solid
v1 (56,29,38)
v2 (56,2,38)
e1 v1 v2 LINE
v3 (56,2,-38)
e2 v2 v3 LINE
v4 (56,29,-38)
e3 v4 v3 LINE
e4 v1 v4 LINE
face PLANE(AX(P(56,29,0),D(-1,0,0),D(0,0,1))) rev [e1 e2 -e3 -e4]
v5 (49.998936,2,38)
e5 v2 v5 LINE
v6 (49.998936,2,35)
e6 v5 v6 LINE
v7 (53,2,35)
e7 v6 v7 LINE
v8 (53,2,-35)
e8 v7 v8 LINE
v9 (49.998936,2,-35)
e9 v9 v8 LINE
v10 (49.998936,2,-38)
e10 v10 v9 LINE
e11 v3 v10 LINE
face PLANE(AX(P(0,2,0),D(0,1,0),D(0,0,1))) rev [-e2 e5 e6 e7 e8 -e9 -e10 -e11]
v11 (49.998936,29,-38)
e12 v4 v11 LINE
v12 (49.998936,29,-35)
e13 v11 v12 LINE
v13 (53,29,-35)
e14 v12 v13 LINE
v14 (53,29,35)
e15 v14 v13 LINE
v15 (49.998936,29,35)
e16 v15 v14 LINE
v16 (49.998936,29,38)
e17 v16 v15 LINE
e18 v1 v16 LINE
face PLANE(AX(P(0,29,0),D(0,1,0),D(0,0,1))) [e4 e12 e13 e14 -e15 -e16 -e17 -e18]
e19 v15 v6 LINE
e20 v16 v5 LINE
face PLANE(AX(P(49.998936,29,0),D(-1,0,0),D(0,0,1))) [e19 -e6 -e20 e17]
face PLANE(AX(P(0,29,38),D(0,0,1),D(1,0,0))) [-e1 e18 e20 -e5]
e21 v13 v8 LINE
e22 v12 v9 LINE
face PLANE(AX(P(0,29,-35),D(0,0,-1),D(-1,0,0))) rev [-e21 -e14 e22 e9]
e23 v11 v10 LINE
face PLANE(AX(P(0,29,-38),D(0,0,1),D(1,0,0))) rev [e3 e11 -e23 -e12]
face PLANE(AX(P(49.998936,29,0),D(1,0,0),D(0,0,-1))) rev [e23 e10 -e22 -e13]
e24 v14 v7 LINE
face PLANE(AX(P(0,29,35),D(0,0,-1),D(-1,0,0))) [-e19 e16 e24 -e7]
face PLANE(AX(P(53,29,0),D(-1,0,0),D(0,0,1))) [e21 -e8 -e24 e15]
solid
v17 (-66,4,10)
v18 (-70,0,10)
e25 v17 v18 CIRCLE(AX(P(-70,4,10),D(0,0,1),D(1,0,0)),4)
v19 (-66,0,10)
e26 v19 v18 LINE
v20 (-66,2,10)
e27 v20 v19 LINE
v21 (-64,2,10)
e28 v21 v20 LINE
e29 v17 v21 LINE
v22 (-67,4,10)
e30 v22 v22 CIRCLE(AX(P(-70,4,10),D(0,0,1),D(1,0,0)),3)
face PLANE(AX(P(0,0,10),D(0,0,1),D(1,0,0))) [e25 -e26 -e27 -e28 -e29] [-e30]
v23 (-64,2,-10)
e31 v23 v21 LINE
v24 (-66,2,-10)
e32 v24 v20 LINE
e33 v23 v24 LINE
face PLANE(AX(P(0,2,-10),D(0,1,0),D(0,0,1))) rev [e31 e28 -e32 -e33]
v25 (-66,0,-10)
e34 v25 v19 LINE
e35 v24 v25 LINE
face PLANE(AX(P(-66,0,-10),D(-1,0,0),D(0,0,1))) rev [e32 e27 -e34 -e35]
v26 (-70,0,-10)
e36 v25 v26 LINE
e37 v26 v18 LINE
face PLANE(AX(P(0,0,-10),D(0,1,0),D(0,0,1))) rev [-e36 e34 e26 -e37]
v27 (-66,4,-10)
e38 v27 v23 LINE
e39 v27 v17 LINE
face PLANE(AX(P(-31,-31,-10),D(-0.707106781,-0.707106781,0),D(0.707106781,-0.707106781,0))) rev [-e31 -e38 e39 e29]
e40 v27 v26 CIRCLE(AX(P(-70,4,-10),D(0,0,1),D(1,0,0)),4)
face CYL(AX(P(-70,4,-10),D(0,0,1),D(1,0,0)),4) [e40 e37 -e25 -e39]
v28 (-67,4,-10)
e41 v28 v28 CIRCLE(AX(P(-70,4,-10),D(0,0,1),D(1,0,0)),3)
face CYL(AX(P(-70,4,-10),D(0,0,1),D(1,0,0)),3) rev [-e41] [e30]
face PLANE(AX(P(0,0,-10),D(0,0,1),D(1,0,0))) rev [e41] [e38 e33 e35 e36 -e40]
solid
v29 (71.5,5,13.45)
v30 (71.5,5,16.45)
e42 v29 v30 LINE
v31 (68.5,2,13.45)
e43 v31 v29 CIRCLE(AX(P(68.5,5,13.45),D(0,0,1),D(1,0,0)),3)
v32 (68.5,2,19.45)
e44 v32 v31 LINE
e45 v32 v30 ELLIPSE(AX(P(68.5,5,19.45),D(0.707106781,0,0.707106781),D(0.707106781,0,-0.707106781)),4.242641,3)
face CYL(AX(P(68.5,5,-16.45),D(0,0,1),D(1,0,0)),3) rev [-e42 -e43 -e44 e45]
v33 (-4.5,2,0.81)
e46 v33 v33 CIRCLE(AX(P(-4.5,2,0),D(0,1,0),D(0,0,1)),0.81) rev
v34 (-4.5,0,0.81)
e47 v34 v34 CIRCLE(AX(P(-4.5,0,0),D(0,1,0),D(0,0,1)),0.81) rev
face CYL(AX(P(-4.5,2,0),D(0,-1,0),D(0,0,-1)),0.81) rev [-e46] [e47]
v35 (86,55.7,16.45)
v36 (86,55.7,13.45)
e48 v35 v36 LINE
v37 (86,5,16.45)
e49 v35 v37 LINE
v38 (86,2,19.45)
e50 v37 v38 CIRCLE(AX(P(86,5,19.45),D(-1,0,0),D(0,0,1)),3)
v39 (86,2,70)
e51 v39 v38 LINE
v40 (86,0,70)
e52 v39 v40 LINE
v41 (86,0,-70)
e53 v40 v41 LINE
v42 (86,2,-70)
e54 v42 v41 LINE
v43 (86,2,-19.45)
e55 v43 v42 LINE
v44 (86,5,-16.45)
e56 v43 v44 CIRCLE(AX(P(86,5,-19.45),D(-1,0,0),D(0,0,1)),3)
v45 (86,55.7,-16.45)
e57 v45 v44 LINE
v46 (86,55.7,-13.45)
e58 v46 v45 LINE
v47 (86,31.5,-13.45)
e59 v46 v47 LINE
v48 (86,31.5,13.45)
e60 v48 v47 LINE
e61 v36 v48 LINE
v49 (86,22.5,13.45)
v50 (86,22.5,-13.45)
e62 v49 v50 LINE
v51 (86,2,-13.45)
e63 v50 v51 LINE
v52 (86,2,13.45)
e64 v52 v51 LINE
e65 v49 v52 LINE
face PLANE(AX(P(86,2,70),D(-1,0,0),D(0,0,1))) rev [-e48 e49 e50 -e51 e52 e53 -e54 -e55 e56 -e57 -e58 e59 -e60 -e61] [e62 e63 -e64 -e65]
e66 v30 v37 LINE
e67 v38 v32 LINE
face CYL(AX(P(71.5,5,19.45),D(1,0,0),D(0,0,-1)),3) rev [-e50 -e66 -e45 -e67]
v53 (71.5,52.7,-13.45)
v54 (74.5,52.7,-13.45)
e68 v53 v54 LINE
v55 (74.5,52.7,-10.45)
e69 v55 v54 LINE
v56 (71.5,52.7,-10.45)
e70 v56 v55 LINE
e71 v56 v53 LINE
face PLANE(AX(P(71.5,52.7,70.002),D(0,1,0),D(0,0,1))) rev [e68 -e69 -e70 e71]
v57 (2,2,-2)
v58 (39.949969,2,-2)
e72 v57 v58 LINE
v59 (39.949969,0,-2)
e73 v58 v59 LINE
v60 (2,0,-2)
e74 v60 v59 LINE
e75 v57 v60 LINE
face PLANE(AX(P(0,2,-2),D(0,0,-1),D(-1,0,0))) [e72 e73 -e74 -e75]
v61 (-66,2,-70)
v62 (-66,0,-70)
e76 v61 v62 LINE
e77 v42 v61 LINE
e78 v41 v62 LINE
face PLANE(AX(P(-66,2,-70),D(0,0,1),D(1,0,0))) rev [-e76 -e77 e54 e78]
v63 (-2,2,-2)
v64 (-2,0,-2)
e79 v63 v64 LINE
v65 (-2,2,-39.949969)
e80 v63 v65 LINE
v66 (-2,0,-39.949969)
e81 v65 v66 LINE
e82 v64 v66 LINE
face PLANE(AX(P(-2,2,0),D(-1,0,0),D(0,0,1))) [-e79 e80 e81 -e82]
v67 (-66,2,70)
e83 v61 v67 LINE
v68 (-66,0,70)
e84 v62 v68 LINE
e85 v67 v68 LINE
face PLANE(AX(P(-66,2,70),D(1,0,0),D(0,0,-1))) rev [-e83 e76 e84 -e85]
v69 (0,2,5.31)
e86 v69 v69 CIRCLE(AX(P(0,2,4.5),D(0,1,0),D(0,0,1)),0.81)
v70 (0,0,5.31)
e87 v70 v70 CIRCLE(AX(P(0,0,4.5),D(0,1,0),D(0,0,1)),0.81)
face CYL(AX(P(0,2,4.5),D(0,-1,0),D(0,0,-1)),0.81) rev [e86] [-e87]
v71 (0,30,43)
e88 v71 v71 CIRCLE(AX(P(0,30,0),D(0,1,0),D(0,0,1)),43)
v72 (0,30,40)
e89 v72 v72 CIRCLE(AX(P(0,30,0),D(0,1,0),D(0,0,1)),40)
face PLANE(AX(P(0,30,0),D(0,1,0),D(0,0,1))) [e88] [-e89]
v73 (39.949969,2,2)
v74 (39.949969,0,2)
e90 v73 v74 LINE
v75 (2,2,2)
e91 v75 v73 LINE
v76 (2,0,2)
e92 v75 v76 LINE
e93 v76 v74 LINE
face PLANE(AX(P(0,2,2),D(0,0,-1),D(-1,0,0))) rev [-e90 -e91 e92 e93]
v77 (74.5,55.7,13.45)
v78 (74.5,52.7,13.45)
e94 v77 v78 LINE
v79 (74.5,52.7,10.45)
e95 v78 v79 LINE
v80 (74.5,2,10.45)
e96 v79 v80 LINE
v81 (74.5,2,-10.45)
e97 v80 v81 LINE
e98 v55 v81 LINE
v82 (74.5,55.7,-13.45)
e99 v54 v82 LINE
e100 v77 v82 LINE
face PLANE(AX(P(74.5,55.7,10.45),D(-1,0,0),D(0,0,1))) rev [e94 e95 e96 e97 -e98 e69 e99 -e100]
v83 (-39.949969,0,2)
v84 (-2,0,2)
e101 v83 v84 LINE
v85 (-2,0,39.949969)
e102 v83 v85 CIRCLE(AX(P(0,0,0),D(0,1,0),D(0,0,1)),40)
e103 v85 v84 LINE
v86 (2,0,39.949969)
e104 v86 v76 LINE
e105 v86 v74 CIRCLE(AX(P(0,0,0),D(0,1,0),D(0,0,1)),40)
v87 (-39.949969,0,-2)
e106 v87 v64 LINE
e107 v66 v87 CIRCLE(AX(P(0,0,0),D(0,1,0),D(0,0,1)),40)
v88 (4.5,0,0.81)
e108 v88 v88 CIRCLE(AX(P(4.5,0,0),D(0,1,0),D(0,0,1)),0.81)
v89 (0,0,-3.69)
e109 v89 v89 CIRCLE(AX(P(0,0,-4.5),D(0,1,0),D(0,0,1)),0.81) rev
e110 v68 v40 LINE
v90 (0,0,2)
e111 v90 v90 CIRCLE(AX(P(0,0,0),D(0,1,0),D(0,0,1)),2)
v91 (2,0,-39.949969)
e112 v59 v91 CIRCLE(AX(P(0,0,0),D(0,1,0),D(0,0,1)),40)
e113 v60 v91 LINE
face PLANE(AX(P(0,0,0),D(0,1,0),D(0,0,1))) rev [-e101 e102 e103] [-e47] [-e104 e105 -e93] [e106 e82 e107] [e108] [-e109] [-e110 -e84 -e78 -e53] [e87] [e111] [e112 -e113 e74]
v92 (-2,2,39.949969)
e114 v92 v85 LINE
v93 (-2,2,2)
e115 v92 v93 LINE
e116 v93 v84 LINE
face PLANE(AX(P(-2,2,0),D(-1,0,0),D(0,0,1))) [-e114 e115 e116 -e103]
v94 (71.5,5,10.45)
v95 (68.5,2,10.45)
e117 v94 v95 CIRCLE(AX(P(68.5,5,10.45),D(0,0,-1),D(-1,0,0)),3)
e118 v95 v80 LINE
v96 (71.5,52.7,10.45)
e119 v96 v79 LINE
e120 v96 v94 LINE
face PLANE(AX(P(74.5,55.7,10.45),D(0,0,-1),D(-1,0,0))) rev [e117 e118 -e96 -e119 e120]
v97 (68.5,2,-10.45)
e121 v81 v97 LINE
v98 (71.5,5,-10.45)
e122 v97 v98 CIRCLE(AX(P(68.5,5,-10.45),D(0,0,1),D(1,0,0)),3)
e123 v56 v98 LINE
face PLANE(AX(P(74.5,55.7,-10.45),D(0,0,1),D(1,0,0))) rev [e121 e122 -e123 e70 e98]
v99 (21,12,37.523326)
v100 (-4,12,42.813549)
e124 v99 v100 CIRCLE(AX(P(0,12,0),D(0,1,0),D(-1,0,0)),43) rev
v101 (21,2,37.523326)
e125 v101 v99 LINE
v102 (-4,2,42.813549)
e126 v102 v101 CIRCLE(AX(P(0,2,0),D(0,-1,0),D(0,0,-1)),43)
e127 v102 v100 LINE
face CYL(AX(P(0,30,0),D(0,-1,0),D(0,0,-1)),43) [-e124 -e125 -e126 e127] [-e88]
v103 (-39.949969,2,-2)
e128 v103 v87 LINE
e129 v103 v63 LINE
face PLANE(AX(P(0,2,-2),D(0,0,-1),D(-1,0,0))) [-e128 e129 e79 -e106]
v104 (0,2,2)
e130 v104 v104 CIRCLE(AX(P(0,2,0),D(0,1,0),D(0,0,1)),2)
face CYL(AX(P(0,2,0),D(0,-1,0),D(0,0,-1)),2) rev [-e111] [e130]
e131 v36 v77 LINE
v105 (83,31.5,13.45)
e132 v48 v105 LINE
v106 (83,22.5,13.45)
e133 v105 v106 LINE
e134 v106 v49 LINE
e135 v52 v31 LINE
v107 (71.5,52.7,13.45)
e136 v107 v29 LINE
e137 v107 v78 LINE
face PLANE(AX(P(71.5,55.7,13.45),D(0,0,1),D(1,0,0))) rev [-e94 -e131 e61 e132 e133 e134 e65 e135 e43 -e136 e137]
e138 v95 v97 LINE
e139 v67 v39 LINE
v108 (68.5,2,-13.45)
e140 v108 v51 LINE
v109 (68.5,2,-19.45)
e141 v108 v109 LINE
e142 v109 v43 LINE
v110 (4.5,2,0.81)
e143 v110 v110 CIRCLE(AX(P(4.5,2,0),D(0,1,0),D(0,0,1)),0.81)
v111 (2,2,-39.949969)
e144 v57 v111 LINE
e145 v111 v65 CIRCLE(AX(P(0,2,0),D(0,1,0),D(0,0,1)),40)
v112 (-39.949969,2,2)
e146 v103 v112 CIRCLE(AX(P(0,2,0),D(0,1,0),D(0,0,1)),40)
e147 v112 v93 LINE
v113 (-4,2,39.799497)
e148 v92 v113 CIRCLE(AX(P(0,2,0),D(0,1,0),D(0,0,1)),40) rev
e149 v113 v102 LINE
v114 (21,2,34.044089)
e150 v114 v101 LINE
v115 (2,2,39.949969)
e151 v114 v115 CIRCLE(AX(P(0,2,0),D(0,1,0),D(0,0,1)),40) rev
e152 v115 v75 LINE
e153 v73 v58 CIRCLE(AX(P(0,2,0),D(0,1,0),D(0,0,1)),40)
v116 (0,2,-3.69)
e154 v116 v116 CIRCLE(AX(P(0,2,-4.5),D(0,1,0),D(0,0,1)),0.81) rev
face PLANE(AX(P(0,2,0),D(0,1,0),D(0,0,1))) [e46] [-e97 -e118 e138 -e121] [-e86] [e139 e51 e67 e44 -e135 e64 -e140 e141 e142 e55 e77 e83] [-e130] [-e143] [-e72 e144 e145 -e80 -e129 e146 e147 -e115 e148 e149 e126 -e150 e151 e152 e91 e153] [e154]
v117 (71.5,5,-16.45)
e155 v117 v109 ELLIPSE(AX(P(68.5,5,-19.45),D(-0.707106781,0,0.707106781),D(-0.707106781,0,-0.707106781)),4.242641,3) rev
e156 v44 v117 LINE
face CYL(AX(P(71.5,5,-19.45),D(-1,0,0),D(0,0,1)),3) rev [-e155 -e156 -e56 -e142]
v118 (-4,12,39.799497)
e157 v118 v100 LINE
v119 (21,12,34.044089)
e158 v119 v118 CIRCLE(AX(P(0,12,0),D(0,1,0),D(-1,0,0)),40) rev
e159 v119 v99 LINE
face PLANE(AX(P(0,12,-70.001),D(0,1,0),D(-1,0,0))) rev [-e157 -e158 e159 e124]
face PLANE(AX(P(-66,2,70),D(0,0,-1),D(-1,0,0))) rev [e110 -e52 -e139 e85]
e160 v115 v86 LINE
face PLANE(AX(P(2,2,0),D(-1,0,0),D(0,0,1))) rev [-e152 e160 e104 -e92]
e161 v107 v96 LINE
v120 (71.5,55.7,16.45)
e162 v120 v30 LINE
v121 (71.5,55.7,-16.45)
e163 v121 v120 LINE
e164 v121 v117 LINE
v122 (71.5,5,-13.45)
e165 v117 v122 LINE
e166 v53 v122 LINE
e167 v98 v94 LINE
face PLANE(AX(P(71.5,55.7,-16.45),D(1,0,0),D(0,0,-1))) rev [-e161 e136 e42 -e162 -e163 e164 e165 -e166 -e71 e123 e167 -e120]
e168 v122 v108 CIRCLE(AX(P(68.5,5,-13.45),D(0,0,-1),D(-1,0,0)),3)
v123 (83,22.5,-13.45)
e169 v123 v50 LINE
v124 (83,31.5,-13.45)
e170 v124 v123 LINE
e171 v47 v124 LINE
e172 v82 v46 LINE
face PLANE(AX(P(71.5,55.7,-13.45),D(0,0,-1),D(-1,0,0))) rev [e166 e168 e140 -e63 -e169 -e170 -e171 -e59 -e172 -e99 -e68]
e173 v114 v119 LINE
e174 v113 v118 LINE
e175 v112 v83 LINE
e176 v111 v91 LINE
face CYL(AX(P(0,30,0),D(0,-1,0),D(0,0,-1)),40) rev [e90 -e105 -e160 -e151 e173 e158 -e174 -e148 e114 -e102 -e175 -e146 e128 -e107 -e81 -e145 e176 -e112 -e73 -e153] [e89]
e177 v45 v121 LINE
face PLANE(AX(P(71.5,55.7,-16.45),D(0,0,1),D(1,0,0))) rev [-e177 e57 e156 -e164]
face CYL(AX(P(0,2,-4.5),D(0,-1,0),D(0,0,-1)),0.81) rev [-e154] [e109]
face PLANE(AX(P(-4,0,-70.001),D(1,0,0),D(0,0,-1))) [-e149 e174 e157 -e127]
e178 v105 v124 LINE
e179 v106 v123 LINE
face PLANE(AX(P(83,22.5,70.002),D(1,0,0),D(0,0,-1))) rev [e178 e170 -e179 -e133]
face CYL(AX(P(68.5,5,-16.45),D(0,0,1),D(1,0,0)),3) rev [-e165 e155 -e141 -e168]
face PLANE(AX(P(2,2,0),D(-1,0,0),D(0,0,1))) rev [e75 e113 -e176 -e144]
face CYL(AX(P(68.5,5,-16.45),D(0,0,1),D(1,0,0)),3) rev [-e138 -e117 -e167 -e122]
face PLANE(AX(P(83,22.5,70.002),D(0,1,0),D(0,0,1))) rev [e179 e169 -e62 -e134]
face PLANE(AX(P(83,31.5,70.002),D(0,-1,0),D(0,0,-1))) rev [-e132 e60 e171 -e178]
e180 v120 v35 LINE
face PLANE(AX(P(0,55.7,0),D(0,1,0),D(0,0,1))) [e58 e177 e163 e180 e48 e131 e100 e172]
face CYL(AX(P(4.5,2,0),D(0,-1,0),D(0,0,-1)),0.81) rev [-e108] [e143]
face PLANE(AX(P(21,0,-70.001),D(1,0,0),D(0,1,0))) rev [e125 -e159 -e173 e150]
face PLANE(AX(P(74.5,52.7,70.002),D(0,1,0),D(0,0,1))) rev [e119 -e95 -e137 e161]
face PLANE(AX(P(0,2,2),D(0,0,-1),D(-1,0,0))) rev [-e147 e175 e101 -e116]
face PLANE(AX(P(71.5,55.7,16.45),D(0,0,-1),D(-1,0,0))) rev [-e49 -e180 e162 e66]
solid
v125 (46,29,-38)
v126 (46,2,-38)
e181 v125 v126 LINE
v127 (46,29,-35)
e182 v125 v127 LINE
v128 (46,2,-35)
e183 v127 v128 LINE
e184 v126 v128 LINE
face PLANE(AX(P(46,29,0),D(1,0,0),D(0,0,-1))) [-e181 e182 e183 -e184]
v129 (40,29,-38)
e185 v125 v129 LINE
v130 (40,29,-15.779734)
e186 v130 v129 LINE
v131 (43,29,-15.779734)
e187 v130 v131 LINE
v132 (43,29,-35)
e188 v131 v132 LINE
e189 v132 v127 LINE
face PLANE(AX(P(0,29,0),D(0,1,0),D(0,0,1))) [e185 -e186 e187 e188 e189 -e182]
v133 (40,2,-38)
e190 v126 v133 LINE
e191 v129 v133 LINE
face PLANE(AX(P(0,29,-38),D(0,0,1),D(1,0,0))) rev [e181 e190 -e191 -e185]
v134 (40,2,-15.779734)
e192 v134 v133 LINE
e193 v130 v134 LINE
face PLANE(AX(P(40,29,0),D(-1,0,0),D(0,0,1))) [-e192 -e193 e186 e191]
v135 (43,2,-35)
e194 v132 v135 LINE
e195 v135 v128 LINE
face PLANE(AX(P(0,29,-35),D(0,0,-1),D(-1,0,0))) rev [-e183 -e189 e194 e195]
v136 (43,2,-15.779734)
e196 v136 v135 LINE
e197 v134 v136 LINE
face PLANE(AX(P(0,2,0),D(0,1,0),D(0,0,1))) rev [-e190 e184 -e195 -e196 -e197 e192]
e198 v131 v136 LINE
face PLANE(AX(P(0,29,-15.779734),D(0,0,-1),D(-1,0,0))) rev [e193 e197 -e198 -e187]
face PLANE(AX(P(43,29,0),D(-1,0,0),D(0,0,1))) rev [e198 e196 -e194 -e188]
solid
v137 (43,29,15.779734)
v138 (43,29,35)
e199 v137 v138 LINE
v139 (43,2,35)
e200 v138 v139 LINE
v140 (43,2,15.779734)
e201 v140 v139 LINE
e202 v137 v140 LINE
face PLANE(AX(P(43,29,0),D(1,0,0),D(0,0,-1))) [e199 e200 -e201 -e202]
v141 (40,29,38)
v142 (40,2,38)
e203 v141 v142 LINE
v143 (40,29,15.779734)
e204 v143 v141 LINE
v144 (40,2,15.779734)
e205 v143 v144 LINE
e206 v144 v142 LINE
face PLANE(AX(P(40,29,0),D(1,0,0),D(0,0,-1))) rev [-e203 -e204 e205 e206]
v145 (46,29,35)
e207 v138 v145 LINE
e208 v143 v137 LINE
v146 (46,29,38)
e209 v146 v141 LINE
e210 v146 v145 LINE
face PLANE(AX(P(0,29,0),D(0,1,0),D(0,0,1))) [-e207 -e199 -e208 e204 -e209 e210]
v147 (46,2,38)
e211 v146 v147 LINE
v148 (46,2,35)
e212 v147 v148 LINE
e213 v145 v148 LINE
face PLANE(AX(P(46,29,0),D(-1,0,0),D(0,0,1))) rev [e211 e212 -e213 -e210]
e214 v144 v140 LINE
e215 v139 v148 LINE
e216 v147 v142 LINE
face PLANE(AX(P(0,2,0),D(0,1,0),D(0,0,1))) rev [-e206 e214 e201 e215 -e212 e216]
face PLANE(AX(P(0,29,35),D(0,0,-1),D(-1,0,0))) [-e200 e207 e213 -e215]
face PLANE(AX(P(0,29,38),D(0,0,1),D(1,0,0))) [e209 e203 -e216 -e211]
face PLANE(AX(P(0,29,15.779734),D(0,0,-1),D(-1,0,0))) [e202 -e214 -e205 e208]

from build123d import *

# Parameters (mm, degrees)
CROQUIS1_R                 = 43
CROQUIS1_R_2               = 40
SALIENTE_EXTRUIR1_DEPTH    = 30
CROQUIS3_R                 = 0.81
CROQUIS3_R_2               = 2
SALIENTE_EXTRUIR2_DEPTH    = 2
CROQUIS4_W                 = 152
CROQUIS4_H                 = 140
CROQUIS4_R                 = 43
SALIENTE_EXTRUIR3_DEPTH    = 2
SALIENTE_EXTRUIR17_DEPTH   = 27
SALIENTE_EXTRUIR17_2_DEPTH = 27
SALIENTE_EXTRUIR17_3_DEPTH = 27
CORTAR_EXTRUIR1_REACH      = 169.021
CORTAR_EXTRUIR1_END_RADIUS = 40
CROQUIS15_W                = 25
CROQUIS15_H                = 10
SALIENTE_EXTRUIR19_START   = -60
CROQUIS18_R                = 4
CROQUIS18_R_2              = 3
SALIENTE_EXTRUIR19_DEPTH   = 20
CROQUIS19_W                = 14.5
CROQUIS19_H                = 3
CROQUIS19_W_2              = 3
CROQUIS19_H_2              = 20.9
SALIENTE_EXTRUIR20_DEPTH   = 53.7
SALIENTE_EXTRUIR21_REACH   = 134.145
CROQUIS20_W                = 3
CROQUIS20_H                = 3
CROQUIS20_H_2              = 9
SALIENTE_EXTRUIR22_START   = 23.9
CROQUIS20_2_W              = 3
CROQUIS20_2_H              = 3
SALIENTE_EXTRUIR22_DEPTH   = 3
REDONDEO1_R                = 3


with BuildPart() as part:
    # Croquis1 → Saliente-Extruir1 (new body)
    with BuildSketch(Plane(origin=(0, 0, 0), x_dir=(1, 0, 0), z_dir=(0, 1, 0))):
        with Locations(Location((0, 0, 0), (0, 0, 270))):
            Circle(CROQUIS1_R)
        with Locations(Location((0, 0, 0), (0, 0, 270))):
            Circle(CROQUIS1_R_2, mode=Mode.SUBTRACT)
    extrude(amount=SALIENTE_EXTRUIR1_DEPTH)

    # Croquis3 → Saliente-Extruir2 (add)
    with BuildSketch(Plane(origin=(0, 0, 0), x_dir=(1, 0, 0), z_dir=(0, 1, 0))):
        with BuildLine():
            Line((-2, 39.949968711), (-2, 2))
            Line((-2, 2), (-39.949968711, 2))
            ThreePointArc((-39.949968711, 2), (-40, 0), (-39.949968711, -2))
            Line((-39.949968711, -2), (-2, -2))
            Line((-2, -2), (-2, -39.949968711))
            ThreePointArc((-2, -39.949968711), (0, -40), (2, -39.949968711))
            Line((2, -39.949968711), (2, -2))
            Line((2, -2), (39.949968711, -2))
            ThreePointArc((39.949968711, -2), (39.987490222, -1.000312842), (40, 0))
            ThreePointArc((40, 0), (39.987490222, 1.000312842), (39.949968711, 2))
            Line((39.949968711, 2), (2, 2))
            Line((2, 2), (2, 39.949968711))
            ThreePointArc((2, 39.949968711), (0, 40), (-2, 39.949968711))
        make_face()
        with Locations(Location((0, -4.5, 0), (0, 0, 270))):
            Circle(CROQUIS3_R, mode=Mode.SUBTRACT)
        with Locations(Location((-4.5, 0, 0), (0, 0, 270))):
            Circle(CROQUIS3_R, mode=Mode.SUBTRACT)
        with Locations(Location((0, 0, 0), (0, 0, 270))):
            Circle(CROQUIS3_R_2, mode=Mode.SUBTRACT)
        with Locations(Location((4.5, 0, 0), (0, 0, 270))):
            Circle(CROQUIS3_R, mode=Mode.SUBTRACT)
        with Locations(Location((0, 4.5, 0), (0, 0, 270))):
            Circle(CROQUIS3_R, mode=Mode.SUBTRACT)
    extrude(amount=SALIENTE_EXTRUIR2_DEPTH)

    # Croquis4 → Saliente-Extruir3 (add)
    with BuildSketch(Plane(origin=(0, 0, 0), x_dir=(1, 0, 0), z_dir=(0, 1, 0))):
        with Locations((10, 0)):
            Rectangle(CROQUIS4_W, CROQUIS4_H)
        with Locations(Location((0, 0, 0), (0, 0, 90))):
            Circle(CROQUIS4_R, mode=Mode.SUBTRACT)
    extrude(amount=SALIENTE_EXTRUIR3_DEPTH)

    # Cortar-Extruir1: up to this cylinder (the profile starts outside it)
    cortar_extruir1_end = Plane(origin=(0, 7, 0), z_dir=(0, -1, 0)) * Cylinder(CORTAR_EXTRUIR1_END_RADIUS, 419.042, mode=Mode.PRIVATE)
    # Croquis15 → Cortar-Extruir1 (cut, up to the surface)
    with BuildSketch(Plane.XY.offset(70), mode=Mode.PRIVATE) as cortar_extruir1_sk1:
        with Locations((8.5, 7)):
            Rectangle(CROQUIS15_W, CROQUIS15_H)
    cortar_extruir1_tool1 = extrude(cortar_extruir1_sk1.sketch, amount=-CORTAR_EXTRUIR1_REACH, mode=Mode.PRIVATE) - cortar_extruir1_end
    add(cortar_extruir1_tool1.solids().sort_by_distance((8.5, 7, 70))[0], mode=Mode.SUBTRACT)

    # Croquis19 → Saliente-Extruir20 (add)
    with BuildSketch(Plane(origin=(0, 2, 0), x_dir=(1, 0, 0), z_dir=(0, 1, 0))):
        with Locations((78.75, 14.95)):
            Rectangle(CROQUIS19_W, CROQUIS19_H)
        with Locations((78.75, -14.95)):
            Rectangle(CROQUIS19_W, CROQUIS19_H)
        with Locations((73, 0)):
            Rectangle(CROQUIS19_W_2, CROQUIS19_H_2)
    extrude(amount=SALIENTE_EXTRUIR20_DEPTH)

    # Croquis20 → Saliente-Extruir21 (add, up to next)
    with BuildSketch(Plane.XY.offset(-13.45), mode=Mode.PRIVATE) as saliente_extruir21_sk1:
        with Locations((73, 54.2)):
            Rectangle(CROQUIS20_W, CROQUIS20_H)
    saliente_extruir21_tool1 = extrude(saliente_extruir21_sk1.sketch, amount=SALIENTE_EXTRUIR21_REACH, mode=Mode.PRIVATE) - part.part
    # Croquis20 → Saliente-Extruir21 (add, up to next)
    with BuildSketch(Plane.XY.offset(-13.45), mode=Mode.PRIVATE) as saliente_extruir21_sk2:
        with Locations((84.5, 27)):
            Rectangle(CROQUIS20_W, CROQUIS20_H_2)
    saliente_extruir21_tool2 = extrude(saliente_extruir21_sk2.sketch, amount=SALIENTE_EXTRUIR21_REACH, mode=Mode.PRIVATE) - part.part
    add(saliente_extruir21_tool1.solids().sort_by_distance((73, 54.2, -13.45))[0])
    add(saliente_extruir21_tool2.solids().sort_by_distance((84.5, 27, -13.45))[0])

    # Croquis20<2> → Saliente-Extruir22 (add)
    with BuildSketch(Plane.XY.offset(-13.45).offset(SALIENTE_EXTRUIR22_START)):
        with Locations((73, 54.2)):
            Rectangle(CROQUIS20_2_W, CROQUIS20_2_H)
    extrude(amount=SALIENTE_EXTRUIR22_DEPTH)

    # Redondeo1
    redondeo1_edges = [part.edges().sort_by_distance(p)[0] for p in [
        (78.75, 2, -16.45),
        (71.5, 2, -14.95),
        (71.5, 2, 0),
        (71.5, 2, 14.95),
        (78.75, 2, 16.45),
    ]]
    fillet(redondeo1_edges, radius=REDONDEO1_R)


with BuildPart() as body_2:
    # Croquis14 → Saliente-Extruir17 (new body)
    with BuildSketch(Plane(origin=(0, 2, 0), x_dir=(1, 0, 0), z_dir=(0, 1, 0))):
        Polygon((43, -15.779733838), (40, -15.779733838), (40, -38), (46, -38), (46, -35), (43, -35), align=None)
    extrude(amount=SALIENTE_EXTRUIR17_DEPTH)


with BuildPart() as body_3:
    # Croquis14 → Saliente-Extruir17 2 (new body)
    with BuildSketch(Plane(origin=(0, 2, 0), x_dir=(1, 0, 0), z_dir=(0, 1, 0))):
        Polygon((56, -38), (56, 38), (49.998935995, 38), (49.998935995, 35), (53, 35), (53, -35), (49.998935995, -35), (49.998935995, -38), align=None)
    extrude(amount=SALIENTE_EXTRUIR17_2_DEPTH)


with BuildPart() as body_4:
    # Croquis14 → Saliente-Extruir17 3 (new body)
    with BuildSketch(Plane(origin=(0, 2, 0), x_dir=(1, 0, 0), z_dir=(0, 1, 0))):
        Polygon((40, 38), (40, 15.779733838), (43, 15.779733838), (43, 35), (46, 35), (46, 38), align=None)
    extrude(amount=SALIENTE_EXTRUIR17_3_DEPTH)


with BuildPart() as body_5:
    # Croquis18 → Saliente-Extruir19 (new body)
    # profile 1 of 2: a face of its own
    with BuildSketch(Plane.XY.offset(70).offset(SALIENTE_EXTRUIR19_START)):
        with BuildLine():
            Line((-66, 0), (-66, 2))
            Line((-66, 2), (-64, 2))
            Line((-64, 2), (-66, 4))
            ThreePointArc((-66, 4), (-67.171572875, 1.171572875), (-70, 0))
            Line((-70, 0), (-66, 0))
        make_face()
    # profile 2 of 2: a face of its own
    with BuildSketch(Plane.XY.offset(70).offset(SALIENTE_EXTRUIR19_START)):
        with Locations((-70, 4)):
            Circle(CROQUIS18_R)
        with Locations((-70, 4)):
            Circle(CROQUIS18_R_2, mode=Mode.SUBTRACT)
    extrude(amount=-SALIENTE_EXTRUIR19_DEPTH)


solid = Compound([part.part, body_2.part, body_3.part, body_4.part, body_5.part])
